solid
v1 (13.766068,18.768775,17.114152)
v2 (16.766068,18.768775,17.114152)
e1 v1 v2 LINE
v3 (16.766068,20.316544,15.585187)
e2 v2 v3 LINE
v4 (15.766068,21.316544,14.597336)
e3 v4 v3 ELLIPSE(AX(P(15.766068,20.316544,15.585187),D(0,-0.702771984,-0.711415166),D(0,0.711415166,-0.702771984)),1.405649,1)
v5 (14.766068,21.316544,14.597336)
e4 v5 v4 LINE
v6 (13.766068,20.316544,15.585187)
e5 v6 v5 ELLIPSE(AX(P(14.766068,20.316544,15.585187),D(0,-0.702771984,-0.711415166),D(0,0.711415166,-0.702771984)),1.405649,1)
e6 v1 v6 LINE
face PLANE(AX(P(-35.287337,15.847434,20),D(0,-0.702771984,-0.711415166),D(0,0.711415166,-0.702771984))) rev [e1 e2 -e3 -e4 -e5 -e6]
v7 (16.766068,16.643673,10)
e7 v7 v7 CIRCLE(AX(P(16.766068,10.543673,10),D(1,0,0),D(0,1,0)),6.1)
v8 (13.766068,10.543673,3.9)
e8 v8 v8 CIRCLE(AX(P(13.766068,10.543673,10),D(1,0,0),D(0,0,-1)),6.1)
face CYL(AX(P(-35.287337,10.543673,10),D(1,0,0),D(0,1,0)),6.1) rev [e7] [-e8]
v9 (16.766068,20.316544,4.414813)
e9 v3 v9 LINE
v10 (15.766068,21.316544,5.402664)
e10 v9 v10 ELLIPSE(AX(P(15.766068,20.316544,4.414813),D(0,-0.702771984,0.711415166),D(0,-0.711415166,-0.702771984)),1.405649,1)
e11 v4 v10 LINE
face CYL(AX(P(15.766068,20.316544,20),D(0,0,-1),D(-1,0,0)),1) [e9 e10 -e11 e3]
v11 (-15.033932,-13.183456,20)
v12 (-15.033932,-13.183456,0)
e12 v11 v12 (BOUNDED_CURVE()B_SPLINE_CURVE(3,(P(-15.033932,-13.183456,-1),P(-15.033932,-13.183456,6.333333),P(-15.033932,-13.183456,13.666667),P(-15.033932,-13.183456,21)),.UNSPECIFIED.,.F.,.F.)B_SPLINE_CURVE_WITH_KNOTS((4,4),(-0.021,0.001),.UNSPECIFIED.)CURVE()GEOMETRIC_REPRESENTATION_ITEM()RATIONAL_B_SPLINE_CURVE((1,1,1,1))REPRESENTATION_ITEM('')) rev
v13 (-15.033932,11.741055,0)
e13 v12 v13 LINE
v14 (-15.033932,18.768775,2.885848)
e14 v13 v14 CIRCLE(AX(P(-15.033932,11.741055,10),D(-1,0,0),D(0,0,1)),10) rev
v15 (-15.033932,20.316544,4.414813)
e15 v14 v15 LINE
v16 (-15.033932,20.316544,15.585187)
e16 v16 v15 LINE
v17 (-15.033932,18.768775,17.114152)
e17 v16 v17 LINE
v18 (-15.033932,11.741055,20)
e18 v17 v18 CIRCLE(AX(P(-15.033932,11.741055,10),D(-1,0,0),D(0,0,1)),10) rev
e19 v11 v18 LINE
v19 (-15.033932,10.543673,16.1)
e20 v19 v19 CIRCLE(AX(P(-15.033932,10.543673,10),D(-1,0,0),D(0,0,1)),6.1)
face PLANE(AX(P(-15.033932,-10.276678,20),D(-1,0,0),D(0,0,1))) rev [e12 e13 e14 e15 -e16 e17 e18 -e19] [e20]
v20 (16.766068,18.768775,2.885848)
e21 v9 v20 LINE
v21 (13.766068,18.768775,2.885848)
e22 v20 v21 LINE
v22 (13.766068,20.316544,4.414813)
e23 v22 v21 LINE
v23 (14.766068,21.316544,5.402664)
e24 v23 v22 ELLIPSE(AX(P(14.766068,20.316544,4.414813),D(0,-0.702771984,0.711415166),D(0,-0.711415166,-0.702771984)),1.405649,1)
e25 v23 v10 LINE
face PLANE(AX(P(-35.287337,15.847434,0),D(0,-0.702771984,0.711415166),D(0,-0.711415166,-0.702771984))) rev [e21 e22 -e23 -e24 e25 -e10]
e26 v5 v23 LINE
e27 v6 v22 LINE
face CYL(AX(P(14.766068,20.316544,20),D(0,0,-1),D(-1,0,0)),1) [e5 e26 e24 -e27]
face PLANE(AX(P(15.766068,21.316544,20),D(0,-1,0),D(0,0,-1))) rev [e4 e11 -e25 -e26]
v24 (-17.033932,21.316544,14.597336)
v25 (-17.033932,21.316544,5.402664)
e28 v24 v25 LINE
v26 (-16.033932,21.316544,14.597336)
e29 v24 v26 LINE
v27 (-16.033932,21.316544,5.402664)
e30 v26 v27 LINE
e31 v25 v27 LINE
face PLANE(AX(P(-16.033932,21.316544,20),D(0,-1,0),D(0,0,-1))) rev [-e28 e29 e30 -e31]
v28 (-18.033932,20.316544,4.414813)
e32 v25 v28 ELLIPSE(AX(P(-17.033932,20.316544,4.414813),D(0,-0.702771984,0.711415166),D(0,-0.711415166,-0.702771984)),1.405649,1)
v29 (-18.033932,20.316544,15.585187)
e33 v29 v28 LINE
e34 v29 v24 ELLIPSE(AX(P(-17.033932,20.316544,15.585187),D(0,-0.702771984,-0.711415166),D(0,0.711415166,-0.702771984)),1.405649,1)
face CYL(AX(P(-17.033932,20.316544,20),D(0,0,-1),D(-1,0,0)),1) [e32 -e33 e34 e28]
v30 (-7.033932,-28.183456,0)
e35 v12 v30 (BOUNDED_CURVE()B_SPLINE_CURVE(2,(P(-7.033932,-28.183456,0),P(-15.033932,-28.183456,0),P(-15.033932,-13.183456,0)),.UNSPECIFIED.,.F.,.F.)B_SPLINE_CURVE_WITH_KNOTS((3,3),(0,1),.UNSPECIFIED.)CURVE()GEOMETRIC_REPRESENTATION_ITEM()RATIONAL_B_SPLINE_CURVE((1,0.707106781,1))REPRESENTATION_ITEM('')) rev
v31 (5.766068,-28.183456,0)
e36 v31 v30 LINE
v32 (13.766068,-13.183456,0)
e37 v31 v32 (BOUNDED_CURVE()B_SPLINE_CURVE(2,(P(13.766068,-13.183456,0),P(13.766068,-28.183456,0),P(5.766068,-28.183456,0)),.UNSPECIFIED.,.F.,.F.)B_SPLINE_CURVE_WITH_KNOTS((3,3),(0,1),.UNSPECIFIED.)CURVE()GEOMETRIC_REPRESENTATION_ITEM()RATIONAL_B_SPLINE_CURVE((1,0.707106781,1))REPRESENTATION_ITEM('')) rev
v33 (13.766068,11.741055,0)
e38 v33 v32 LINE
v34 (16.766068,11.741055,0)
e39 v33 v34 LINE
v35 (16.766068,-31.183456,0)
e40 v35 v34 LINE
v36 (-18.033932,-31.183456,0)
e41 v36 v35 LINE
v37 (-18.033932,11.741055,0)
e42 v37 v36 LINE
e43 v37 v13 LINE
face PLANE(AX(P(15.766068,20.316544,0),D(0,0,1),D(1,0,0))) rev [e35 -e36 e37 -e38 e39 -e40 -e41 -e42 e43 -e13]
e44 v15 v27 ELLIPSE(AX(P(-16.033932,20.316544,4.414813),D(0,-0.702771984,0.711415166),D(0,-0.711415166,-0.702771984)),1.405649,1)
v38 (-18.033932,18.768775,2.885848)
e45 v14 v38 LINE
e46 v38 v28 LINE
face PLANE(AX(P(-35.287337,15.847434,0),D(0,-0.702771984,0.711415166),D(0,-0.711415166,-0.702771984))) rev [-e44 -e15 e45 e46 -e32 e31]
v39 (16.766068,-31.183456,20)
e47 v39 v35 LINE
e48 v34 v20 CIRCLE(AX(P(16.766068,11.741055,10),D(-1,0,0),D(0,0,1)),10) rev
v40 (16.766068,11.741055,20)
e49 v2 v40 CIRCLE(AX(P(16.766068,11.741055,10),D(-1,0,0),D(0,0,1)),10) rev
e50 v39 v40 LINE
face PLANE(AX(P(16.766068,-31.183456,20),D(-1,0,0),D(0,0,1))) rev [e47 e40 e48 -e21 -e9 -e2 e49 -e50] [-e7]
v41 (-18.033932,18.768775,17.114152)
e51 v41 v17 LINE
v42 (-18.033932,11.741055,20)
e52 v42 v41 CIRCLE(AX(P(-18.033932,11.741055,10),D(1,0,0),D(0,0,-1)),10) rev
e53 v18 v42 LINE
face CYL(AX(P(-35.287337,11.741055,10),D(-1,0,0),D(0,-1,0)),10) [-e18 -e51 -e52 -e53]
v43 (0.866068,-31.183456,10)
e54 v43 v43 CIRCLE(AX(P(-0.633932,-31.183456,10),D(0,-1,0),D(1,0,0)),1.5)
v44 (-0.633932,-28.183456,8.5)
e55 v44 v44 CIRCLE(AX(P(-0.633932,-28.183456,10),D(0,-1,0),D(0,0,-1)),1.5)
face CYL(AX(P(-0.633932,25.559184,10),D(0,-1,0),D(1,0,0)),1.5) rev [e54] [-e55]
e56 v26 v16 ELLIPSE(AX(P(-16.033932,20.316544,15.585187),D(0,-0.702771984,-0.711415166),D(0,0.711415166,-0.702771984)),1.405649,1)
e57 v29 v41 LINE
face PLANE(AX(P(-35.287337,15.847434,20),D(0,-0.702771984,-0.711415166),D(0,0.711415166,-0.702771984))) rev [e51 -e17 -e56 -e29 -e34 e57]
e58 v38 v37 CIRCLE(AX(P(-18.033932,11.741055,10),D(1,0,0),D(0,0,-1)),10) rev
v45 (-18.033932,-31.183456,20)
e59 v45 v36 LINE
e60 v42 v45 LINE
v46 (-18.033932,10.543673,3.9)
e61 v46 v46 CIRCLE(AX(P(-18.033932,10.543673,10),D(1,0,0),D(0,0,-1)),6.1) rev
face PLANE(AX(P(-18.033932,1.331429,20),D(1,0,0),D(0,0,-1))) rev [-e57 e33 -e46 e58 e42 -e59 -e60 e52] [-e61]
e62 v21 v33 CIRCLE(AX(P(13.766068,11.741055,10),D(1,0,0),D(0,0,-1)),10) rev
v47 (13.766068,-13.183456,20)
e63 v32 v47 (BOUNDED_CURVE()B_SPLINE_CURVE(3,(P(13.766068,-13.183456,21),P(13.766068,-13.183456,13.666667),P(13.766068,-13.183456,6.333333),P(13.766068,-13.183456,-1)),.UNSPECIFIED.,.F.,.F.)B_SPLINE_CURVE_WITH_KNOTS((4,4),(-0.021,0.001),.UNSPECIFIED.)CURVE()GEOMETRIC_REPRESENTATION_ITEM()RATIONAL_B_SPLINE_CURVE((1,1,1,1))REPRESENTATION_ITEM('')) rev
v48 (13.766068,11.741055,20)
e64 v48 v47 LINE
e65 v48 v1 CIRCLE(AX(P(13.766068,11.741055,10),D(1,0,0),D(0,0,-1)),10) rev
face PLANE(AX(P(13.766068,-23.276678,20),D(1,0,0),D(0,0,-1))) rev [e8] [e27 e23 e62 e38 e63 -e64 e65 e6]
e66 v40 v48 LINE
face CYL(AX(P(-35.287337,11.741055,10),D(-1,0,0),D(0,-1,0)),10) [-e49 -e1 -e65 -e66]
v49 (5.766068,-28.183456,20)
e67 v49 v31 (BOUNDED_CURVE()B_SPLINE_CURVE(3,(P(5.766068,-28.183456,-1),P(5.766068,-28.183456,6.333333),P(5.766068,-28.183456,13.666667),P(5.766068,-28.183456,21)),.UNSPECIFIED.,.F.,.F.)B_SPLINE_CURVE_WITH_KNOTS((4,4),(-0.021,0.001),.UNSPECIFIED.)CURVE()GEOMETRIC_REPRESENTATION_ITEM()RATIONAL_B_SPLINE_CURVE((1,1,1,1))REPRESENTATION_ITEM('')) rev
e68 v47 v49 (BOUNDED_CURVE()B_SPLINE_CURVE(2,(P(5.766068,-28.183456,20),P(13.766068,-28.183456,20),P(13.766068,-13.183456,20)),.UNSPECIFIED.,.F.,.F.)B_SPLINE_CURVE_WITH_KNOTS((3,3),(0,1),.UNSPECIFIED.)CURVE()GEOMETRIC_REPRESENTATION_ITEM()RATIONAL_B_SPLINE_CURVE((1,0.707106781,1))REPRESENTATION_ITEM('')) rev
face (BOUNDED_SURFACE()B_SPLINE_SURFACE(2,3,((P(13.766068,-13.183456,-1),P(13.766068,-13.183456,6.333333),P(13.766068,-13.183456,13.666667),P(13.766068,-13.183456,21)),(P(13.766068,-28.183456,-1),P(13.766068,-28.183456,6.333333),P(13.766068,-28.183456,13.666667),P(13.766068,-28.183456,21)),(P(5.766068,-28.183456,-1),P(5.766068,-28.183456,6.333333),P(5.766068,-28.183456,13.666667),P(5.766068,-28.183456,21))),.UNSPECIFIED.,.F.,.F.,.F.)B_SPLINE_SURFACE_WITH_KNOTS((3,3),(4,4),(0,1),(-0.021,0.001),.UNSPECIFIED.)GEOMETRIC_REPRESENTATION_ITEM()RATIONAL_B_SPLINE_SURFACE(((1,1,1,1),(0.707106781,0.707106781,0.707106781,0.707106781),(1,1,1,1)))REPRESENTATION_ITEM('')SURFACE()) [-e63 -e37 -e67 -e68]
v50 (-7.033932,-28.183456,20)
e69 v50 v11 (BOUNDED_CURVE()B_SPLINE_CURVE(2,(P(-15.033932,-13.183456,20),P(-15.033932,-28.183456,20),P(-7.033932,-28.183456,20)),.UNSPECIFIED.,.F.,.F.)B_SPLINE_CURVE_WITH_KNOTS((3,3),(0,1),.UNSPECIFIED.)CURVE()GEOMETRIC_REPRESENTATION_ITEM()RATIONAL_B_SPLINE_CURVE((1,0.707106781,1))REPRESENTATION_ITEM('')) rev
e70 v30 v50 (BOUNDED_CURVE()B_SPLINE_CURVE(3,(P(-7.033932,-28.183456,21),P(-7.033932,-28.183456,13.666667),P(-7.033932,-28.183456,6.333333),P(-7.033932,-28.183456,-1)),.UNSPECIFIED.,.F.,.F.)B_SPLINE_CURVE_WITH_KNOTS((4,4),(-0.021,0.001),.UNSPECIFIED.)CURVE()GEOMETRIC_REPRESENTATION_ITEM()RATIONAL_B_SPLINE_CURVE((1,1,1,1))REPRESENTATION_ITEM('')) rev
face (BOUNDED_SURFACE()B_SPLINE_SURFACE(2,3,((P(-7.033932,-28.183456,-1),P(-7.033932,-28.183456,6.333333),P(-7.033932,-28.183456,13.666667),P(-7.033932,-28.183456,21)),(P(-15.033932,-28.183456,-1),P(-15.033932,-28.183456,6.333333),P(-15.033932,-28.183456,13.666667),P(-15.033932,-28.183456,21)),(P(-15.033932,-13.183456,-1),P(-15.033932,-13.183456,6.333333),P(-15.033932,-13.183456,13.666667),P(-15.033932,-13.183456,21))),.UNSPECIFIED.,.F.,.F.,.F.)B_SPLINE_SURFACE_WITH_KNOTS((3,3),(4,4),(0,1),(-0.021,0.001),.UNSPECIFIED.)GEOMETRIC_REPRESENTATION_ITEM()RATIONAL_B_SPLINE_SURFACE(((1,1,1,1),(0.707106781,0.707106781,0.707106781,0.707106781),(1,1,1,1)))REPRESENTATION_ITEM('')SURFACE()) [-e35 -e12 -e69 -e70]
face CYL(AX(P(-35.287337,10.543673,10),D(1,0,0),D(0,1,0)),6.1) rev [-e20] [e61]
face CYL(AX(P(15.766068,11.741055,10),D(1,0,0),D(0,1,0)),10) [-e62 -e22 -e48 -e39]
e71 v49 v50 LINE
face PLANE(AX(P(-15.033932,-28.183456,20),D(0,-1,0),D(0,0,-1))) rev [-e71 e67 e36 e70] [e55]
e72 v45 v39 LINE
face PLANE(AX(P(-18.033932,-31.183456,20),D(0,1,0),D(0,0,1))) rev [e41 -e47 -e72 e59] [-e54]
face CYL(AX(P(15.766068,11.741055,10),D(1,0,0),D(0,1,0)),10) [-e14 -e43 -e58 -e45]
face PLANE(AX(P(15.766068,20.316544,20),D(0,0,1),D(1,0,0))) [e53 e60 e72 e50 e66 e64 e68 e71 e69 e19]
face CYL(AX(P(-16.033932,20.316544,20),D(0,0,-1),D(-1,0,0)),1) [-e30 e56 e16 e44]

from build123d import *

# Parameters (mm, degrees)
EXTRUDE_1_DEPTH     = 20
CUT_EXTRUDE_1_REACH = 52.828
SKETCH_2_R          = 6.1
SKETCH_3_R          = 1.5
CUT_EXTRUDE_2_DEPTH = 52.5
FILLET_1_R          = 10
FILLET_2_SIZE       = 15
FILLET_2_SIZE_2     = 8
FILLET_3_SIZE       = 8
FILLET_3_SIZE_2     = 15


with BuildPart() as part:
    # 草图1 → 凸台-拉伸1 (new body)
    with BuildSketch(Plane.XY):
        with BuildLine():
            Line((-18.033931645, 1.331428571), (-18.033931645, -31.183456439))
            Line((-18.033931645, -31.183456439), (16.766068355, -31.183456439))
            Line((16.766068355, -31.183456439), (16.766068355, 20.316543561))
            ThreePointArc((16.766068355, 20.316543561), (16.473175136, 21.023650343), (15.766068355, 21.316543561))
            Line((15.766068355, 21.316543561), (14.766068355, 21.316543561))
            ThreePointArc((14.766068355, 21.316543561), (14.058961574, 21.023650343), (13.766068355, 20.316543561))
            Line((13.766068355, 20.316543561), (13.766068355, -23.276677649))
            Line((13.766068355, -23.276677649), (13.766068355, -28.183456439))
            Line((13.766068355, -28.183456439), (9.089631855, -28.183456439))
            Line((9.089631855, -28.183456439), (-9.577824429, -28.183456439))
            Line((-9.577824429, -28.183456439), (-15.033931645, -28.183456439))
            Line((-15.033931645, -28.183456439), (-15.033931645, -23.510349705))
            Line((-15.033931645, -23.510349705), (-15.033931645, -10.276677649))
            Line((-15.033931645, -10.276677649), (-15.033931645, 20.316543561))
            ThreePointArc((-15.033931645, 20.316543561), (-15.326824864, 21.023650343), (-16.033931645, 21.316543561))
            Line((-16.033931645, 21.316543561), (-17.033931645, 21.316543561))
            ThreePointArc((-17.033931645, 21.316543561), (-17.741038426, 21.023650343), (-18.033931645, 20.316543561))
            Line((-18.033931645, 20.316543561), (-18.033931645, 1.331428571))
        make_face()
    extrude(amount=EXTRUDE_1_DEPTH)

    # 切除-拉伸1: up to this face of the body (flat: up to its plane)
    cut_extrude_1_end = Plane(part.part.faces().sort_by_distance((-18.033931645, -5.433456439, 10))[0])
    # 草图2 → 切除-拉伸1 (cut, up to the picked face)
    with BuildSketch(Plane(origin=(16.766068355, 0, 0), x_dir=(0, 0, -1), z_dir=(1, 0, 0)), mode=Mode.PRIVATE) as cut_extrude_1_sk1:
        with Locations((-10, 10.543673469)):
            Circle(SKETCH_2_R)
    cut_extrude_1_tool1 = split(extrude(cut_extrude_1_sk1.sketch, amount=-CUT_EXTRUDE_1_REACH, mode=Mode.PRIVATE), bisect_by=cut_extrude_1_end, keep=Keep.BOTH, mode=Mode.PRIVATE)
    # 草图2 → 切除-拉伸1 (cut, up to the picked face)
    with BuildSketch(Plane(origin=(16.766068355, 0, 0), x_dir=(0, 0, -1), z_dir=(1, 0, 0)), mode=Mode.PRIVATE) as cut_extrude_1_sk2:
        Polygon((0, 15.84743417), (-5.402663646, 21.316543561), (0, 21.316543561), align=None)
    cut_extrude_1_tool2 = split(extrude(cut_extrude_1_sk2.sketch, amount=-CUT_EXTRUDE_1_REACH, mode=Mode.PRIVATE), bisect_by=cut_extrude_1_end, keep=Keep.BOTH, mode=Mode.PRIVATE)
    # 草图2 → 切除-拉伸1 (cut, up to the picked face)
    with BuildSketch(Plane(origin=(16.766068355, 0, 0), x_dir=(0, 0, -1), z_dir=(1, 0, 0)), mode=Mode.PRIVATE) as cut_extrude_1_sk3:
        Polygon((-20, 15.84743417), (-14.597336354, 21.316543561), (-20, 21.316543561), align=None)
    cut_extrude_1_tool3 = split(extrude(cut_extrude_1_sk3.sketch, amount=-CUT_EXTRUDE_1_REACH, mode=Mode.PRIVATE), bisect_by=cut_extrude_1_end, keep=Keep.BOTH, mode=Mode.PRIVATE)
    add(cut_extrude_1_tool1.solids().sort_by(Axis((16.766068, 10.543673, 10), (-1, 0, 0)))[0], mode=Mode.SUBTRACT)
    add(cut_extrude_1_tool2.solids().sort_by(Axis((16.766068, 19.493507, 1.800888), (-1, 0, 0)))[0], mode=Mode.SUBTRACT)
    add(cut_extrude_1_tool3.solids().sort_by(Axis((16.766068, 19.493507, 18.199112), (-1, 0, 0)))[0], mode=Mode.SUBTRACT)

    # 草图3 → 切除-拉伸2 (cut)
    with BuildSketch(Plane.XZ.offset(31.183456439)):
        with Locations((-0.633931645, 10)):
            Circle(SKETCH_3_R)
    extrude(amount=-CUT_EXTRUDE_2_DEPTH, mode=Mode.SUBTRACT)

    # 圆角1
    fillet_1_edges = [part.edges().sort_by_distance(p)[0] for p in [
        (15.266068355, 15.84743417, 0),
        (15.266068355, 15.84743417, 20),
        (-16.533931645, 15.84743417, 20),
        (-16.533931645, 15.84743417, 0),
    ]]
    fillet(fillet_1_edges, radius=FILLET_1_R)

    # 圆角2
    # an asymmetric fillet: 15, 8 mm, written as the material it adds along each edge
    with BuildSketch(Plane(origin=(-15.033931645, -28.183456439, 0), x_dir=(0, 1, 0), z_dir=(0, 0, 1))) as fillet_2_piece_1:
        with BuildLine():
            Bezier((FILLET_2_SIZE, 0), (0, 0), (0, -FILLET_2_SIZE_2), weights=[1, 0.707106781, 1])
            Line((0, -FILLET_2_SIZE_2), (0, 0))
            Line((0, 0), (FILLET_2_SIZE, 0))
        make_face()
    extrude(amount=20)

    # 圆角3
    # an asymmetric fillet: 15, 8 mm, written as the material it adds along each edge
    with BuildSketch(Plane(origin=(13.766068355, -28.183456439, 0), x_dir=(-1, 0, 0), z_dir=(0, 0, 1))) as fillet_3_piece_1:
        with BuildLine():
            Bezier((FILLET_3_SIZE, 0), (0, 0), (0, -FILLET_3_SIZE_2), weights=[1, 0.707106781, 1])
            Line((0, -FILLET_3_SIZE_2), (0, 0))
            Line((0, 0), (FILLET_3_SIZE, 0))
        make_face()
    extrude(amount=20)


solid = part.part
